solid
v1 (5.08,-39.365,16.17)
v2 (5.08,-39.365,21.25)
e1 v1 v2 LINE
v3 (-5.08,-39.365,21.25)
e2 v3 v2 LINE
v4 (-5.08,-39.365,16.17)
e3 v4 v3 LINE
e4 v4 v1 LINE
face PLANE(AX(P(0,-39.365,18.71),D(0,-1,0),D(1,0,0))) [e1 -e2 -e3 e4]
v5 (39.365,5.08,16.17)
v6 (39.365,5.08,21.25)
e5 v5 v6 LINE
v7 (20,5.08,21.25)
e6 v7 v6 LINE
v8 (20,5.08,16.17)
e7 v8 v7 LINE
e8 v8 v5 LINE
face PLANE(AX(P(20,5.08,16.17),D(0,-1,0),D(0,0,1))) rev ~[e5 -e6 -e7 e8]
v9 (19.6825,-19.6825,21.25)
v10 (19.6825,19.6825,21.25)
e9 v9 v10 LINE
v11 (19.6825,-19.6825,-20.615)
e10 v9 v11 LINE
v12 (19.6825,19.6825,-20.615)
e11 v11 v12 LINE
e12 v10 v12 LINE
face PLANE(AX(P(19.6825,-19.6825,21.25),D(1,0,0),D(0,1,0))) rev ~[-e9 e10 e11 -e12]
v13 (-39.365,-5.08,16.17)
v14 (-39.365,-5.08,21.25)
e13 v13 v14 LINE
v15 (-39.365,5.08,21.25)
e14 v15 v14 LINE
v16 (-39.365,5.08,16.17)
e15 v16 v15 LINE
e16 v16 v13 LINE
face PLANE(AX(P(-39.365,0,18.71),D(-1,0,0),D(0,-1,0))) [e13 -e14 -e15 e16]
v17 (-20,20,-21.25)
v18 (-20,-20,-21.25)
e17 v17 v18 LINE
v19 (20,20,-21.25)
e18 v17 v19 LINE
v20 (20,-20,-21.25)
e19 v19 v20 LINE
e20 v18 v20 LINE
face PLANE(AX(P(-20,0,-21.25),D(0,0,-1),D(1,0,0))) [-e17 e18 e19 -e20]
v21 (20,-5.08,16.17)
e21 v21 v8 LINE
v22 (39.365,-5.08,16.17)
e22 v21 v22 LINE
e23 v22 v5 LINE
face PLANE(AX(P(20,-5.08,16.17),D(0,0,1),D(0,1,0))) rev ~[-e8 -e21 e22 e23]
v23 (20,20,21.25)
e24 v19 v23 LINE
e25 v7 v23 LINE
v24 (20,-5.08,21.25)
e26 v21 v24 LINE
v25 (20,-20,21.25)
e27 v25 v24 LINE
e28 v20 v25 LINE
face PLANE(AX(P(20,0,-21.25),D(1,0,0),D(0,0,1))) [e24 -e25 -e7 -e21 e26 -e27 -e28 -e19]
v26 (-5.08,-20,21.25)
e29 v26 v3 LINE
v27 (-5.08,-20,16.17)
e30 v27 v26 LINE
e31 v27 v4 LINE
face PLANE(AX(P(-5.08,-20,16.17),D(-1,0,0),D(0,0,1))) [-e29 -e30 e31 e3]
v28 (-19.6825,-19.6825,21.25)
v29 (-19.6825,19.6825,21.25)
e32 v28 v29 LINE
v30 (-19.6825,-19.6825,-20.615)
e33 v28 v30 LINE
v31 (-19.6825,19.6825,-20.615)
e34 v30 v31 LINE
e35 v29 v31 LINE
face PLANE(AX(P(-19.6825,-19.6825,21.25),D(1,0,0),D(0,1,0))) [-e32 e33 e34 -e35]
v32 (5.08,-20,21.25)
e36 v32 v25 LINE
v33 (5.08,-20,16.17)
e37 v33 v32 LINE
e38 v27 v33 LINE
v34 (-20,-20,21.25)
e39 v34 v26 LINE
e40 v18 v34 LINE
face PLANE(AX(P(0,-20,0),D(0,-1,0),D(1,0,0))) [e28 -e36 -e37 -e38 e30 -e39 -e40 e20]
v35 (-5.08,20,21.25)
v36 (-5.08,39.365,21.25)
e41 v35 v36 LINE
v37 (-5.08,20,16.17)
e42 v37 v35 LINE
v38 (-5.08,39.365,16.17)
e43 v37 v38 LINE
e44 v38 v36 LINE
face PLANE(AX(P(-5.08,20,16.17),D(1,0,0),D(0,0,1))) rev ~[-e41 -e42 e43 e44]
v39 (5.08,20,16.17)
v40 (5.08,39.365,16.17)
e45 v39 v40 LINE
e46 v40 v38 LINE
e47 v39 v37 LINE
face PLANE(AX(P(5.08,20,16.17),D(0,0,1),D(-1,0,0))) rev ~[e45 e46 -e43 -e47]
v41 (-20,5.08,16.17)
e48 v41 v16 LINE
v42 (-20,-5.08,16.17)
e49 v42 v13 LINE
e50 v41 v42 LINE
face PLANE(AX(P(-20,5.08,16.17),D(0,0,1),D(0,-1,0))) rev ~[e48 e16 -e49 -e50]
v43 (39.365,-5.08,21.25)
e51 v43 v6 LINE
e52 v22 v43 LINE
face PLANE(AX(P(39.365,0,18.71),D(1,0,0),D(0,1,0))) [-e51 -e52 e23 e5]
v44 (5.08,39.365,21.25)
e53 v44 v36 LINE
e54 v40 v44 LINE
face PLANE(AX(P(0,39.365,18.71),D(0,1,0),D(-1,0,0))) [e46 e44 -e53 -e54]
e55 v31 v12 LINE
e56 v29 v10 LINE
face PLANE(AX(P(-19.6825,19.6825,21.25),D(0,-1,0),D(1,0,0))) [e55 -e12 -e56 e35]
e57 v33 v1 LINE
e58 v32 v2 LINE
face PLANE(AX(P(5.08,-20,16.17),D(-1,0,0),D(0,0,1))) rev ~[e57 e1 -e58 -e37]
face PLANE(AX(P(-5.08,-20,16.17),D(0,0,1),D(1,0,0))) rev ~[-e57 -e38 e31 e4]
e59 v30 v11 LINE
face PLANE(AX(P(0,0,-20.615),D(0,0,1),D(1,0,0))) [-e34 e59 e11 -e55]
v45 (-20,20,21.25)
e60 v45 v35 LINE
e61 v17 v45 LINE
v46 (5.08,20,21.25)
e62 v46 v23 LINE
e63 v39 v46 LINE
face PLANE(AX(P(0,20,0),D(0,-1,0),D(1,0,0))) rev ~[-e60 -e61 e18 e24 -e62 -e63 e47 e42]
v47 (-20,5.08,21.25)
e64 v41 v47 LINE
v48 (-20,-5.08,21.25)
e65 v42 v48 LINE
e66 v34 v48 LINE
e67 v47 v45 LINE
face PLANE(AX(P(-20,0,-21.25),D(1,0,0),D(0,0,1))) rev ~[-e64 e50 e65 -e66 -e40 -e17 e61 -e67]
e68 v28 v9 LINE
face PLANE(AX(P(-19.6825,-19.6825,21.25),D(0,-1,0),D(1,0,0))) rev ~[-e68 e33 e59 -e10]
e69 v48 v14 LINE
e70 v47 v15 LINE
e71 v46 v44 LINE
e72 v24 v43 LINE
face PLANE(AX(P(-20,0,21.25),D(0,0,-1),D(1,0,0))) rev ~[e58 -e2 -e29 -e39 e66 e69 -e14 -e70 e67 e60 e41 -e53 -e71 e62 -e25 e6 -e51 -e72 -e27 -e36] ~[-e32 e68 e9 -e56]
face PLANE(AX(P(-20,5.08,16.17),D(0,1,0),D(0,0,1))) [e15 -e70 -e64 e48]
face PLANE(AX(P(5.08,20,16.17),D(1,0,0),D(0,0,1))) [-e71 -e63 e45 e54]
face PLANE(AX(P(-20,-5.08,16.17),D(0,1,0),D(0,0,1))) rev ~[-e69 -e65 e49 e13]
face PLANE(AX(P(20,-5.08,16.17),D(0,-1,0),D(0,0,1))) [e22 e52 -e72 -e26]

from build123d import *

# Parameters (mm, degrees)
F0_W      = 40
F0_H      = 42.5
F1_DEPTH  = 20
F2_W      = 39.365
F2_H      = 39.365
F3_DEPTH  = 41.865
F4_W      = 10.16
F4_H      = 5.08
F8_DEPTH  = 19.365
F5_W      = 10.16
F5_H      = 5.08
F9_DEPTH  = 19.365
F6_W      = 10.16
F6_H      = 5.08
F10_DEPTH = 19.365
F7_W      = 10.16
F7_H      = 5.08
F11_DEPTH = 19.365


with BuildPart() as f1:
    # F0 (on Front) → F1 (new body, symmetric)
    with BuildSketch(Plane.XZ):
        Rectangle(F0_W, F0_H)
    extrude(amount=F1_DEPTH, both=True)

    # F2 (on face) → F3 (cut)
    with BuildSketch(Plane.XY.offset(21.25)):
        Rectangle(F2_W, F2_H)
    extrude(amount=-F3_DEPTH, mode=Mode.SUBTRACT)

    # F4 (on face) → F8 (join)
    with BuildSketch(Plane.XZ.offset(20)):
        with Locations((0, 18.71)):
            Rectangle(F4_W, F4_H)
    extrude(amount=F8_DEPTH)

    # F5 (on face) → F9 (join)
    with BuildSketch(Plane(origin=(-20, 0, 0), x_dir=(0, -1, 0), z_dir=(-1, 0, 0))):
        with Locations((0, 18.71)):
            Rectangle(F5_W, F5_H)
    extrude(amount=F9_DEPTH)

    # F6 (on face) → F10 (join)
    with BuildSketch(Plane(origin=(0, 20, 0), x_dir=(-1, 0, 0), z_dir=(0, 1, 0))):
        with Locations((0, 18.71)):
            Rectangle(F6_W, F6_H)
    extrude(amount=F10_DEPTH)

    # F7 (on face) → F11 (join)
    with BuildSketch(Plane.YZ.offset(20)):
        with Locations((0, 18.71)):
            Rectangle(F7_W, F7_H)
    extrude(amount=F11_DEPTH)


solid = f1.part
